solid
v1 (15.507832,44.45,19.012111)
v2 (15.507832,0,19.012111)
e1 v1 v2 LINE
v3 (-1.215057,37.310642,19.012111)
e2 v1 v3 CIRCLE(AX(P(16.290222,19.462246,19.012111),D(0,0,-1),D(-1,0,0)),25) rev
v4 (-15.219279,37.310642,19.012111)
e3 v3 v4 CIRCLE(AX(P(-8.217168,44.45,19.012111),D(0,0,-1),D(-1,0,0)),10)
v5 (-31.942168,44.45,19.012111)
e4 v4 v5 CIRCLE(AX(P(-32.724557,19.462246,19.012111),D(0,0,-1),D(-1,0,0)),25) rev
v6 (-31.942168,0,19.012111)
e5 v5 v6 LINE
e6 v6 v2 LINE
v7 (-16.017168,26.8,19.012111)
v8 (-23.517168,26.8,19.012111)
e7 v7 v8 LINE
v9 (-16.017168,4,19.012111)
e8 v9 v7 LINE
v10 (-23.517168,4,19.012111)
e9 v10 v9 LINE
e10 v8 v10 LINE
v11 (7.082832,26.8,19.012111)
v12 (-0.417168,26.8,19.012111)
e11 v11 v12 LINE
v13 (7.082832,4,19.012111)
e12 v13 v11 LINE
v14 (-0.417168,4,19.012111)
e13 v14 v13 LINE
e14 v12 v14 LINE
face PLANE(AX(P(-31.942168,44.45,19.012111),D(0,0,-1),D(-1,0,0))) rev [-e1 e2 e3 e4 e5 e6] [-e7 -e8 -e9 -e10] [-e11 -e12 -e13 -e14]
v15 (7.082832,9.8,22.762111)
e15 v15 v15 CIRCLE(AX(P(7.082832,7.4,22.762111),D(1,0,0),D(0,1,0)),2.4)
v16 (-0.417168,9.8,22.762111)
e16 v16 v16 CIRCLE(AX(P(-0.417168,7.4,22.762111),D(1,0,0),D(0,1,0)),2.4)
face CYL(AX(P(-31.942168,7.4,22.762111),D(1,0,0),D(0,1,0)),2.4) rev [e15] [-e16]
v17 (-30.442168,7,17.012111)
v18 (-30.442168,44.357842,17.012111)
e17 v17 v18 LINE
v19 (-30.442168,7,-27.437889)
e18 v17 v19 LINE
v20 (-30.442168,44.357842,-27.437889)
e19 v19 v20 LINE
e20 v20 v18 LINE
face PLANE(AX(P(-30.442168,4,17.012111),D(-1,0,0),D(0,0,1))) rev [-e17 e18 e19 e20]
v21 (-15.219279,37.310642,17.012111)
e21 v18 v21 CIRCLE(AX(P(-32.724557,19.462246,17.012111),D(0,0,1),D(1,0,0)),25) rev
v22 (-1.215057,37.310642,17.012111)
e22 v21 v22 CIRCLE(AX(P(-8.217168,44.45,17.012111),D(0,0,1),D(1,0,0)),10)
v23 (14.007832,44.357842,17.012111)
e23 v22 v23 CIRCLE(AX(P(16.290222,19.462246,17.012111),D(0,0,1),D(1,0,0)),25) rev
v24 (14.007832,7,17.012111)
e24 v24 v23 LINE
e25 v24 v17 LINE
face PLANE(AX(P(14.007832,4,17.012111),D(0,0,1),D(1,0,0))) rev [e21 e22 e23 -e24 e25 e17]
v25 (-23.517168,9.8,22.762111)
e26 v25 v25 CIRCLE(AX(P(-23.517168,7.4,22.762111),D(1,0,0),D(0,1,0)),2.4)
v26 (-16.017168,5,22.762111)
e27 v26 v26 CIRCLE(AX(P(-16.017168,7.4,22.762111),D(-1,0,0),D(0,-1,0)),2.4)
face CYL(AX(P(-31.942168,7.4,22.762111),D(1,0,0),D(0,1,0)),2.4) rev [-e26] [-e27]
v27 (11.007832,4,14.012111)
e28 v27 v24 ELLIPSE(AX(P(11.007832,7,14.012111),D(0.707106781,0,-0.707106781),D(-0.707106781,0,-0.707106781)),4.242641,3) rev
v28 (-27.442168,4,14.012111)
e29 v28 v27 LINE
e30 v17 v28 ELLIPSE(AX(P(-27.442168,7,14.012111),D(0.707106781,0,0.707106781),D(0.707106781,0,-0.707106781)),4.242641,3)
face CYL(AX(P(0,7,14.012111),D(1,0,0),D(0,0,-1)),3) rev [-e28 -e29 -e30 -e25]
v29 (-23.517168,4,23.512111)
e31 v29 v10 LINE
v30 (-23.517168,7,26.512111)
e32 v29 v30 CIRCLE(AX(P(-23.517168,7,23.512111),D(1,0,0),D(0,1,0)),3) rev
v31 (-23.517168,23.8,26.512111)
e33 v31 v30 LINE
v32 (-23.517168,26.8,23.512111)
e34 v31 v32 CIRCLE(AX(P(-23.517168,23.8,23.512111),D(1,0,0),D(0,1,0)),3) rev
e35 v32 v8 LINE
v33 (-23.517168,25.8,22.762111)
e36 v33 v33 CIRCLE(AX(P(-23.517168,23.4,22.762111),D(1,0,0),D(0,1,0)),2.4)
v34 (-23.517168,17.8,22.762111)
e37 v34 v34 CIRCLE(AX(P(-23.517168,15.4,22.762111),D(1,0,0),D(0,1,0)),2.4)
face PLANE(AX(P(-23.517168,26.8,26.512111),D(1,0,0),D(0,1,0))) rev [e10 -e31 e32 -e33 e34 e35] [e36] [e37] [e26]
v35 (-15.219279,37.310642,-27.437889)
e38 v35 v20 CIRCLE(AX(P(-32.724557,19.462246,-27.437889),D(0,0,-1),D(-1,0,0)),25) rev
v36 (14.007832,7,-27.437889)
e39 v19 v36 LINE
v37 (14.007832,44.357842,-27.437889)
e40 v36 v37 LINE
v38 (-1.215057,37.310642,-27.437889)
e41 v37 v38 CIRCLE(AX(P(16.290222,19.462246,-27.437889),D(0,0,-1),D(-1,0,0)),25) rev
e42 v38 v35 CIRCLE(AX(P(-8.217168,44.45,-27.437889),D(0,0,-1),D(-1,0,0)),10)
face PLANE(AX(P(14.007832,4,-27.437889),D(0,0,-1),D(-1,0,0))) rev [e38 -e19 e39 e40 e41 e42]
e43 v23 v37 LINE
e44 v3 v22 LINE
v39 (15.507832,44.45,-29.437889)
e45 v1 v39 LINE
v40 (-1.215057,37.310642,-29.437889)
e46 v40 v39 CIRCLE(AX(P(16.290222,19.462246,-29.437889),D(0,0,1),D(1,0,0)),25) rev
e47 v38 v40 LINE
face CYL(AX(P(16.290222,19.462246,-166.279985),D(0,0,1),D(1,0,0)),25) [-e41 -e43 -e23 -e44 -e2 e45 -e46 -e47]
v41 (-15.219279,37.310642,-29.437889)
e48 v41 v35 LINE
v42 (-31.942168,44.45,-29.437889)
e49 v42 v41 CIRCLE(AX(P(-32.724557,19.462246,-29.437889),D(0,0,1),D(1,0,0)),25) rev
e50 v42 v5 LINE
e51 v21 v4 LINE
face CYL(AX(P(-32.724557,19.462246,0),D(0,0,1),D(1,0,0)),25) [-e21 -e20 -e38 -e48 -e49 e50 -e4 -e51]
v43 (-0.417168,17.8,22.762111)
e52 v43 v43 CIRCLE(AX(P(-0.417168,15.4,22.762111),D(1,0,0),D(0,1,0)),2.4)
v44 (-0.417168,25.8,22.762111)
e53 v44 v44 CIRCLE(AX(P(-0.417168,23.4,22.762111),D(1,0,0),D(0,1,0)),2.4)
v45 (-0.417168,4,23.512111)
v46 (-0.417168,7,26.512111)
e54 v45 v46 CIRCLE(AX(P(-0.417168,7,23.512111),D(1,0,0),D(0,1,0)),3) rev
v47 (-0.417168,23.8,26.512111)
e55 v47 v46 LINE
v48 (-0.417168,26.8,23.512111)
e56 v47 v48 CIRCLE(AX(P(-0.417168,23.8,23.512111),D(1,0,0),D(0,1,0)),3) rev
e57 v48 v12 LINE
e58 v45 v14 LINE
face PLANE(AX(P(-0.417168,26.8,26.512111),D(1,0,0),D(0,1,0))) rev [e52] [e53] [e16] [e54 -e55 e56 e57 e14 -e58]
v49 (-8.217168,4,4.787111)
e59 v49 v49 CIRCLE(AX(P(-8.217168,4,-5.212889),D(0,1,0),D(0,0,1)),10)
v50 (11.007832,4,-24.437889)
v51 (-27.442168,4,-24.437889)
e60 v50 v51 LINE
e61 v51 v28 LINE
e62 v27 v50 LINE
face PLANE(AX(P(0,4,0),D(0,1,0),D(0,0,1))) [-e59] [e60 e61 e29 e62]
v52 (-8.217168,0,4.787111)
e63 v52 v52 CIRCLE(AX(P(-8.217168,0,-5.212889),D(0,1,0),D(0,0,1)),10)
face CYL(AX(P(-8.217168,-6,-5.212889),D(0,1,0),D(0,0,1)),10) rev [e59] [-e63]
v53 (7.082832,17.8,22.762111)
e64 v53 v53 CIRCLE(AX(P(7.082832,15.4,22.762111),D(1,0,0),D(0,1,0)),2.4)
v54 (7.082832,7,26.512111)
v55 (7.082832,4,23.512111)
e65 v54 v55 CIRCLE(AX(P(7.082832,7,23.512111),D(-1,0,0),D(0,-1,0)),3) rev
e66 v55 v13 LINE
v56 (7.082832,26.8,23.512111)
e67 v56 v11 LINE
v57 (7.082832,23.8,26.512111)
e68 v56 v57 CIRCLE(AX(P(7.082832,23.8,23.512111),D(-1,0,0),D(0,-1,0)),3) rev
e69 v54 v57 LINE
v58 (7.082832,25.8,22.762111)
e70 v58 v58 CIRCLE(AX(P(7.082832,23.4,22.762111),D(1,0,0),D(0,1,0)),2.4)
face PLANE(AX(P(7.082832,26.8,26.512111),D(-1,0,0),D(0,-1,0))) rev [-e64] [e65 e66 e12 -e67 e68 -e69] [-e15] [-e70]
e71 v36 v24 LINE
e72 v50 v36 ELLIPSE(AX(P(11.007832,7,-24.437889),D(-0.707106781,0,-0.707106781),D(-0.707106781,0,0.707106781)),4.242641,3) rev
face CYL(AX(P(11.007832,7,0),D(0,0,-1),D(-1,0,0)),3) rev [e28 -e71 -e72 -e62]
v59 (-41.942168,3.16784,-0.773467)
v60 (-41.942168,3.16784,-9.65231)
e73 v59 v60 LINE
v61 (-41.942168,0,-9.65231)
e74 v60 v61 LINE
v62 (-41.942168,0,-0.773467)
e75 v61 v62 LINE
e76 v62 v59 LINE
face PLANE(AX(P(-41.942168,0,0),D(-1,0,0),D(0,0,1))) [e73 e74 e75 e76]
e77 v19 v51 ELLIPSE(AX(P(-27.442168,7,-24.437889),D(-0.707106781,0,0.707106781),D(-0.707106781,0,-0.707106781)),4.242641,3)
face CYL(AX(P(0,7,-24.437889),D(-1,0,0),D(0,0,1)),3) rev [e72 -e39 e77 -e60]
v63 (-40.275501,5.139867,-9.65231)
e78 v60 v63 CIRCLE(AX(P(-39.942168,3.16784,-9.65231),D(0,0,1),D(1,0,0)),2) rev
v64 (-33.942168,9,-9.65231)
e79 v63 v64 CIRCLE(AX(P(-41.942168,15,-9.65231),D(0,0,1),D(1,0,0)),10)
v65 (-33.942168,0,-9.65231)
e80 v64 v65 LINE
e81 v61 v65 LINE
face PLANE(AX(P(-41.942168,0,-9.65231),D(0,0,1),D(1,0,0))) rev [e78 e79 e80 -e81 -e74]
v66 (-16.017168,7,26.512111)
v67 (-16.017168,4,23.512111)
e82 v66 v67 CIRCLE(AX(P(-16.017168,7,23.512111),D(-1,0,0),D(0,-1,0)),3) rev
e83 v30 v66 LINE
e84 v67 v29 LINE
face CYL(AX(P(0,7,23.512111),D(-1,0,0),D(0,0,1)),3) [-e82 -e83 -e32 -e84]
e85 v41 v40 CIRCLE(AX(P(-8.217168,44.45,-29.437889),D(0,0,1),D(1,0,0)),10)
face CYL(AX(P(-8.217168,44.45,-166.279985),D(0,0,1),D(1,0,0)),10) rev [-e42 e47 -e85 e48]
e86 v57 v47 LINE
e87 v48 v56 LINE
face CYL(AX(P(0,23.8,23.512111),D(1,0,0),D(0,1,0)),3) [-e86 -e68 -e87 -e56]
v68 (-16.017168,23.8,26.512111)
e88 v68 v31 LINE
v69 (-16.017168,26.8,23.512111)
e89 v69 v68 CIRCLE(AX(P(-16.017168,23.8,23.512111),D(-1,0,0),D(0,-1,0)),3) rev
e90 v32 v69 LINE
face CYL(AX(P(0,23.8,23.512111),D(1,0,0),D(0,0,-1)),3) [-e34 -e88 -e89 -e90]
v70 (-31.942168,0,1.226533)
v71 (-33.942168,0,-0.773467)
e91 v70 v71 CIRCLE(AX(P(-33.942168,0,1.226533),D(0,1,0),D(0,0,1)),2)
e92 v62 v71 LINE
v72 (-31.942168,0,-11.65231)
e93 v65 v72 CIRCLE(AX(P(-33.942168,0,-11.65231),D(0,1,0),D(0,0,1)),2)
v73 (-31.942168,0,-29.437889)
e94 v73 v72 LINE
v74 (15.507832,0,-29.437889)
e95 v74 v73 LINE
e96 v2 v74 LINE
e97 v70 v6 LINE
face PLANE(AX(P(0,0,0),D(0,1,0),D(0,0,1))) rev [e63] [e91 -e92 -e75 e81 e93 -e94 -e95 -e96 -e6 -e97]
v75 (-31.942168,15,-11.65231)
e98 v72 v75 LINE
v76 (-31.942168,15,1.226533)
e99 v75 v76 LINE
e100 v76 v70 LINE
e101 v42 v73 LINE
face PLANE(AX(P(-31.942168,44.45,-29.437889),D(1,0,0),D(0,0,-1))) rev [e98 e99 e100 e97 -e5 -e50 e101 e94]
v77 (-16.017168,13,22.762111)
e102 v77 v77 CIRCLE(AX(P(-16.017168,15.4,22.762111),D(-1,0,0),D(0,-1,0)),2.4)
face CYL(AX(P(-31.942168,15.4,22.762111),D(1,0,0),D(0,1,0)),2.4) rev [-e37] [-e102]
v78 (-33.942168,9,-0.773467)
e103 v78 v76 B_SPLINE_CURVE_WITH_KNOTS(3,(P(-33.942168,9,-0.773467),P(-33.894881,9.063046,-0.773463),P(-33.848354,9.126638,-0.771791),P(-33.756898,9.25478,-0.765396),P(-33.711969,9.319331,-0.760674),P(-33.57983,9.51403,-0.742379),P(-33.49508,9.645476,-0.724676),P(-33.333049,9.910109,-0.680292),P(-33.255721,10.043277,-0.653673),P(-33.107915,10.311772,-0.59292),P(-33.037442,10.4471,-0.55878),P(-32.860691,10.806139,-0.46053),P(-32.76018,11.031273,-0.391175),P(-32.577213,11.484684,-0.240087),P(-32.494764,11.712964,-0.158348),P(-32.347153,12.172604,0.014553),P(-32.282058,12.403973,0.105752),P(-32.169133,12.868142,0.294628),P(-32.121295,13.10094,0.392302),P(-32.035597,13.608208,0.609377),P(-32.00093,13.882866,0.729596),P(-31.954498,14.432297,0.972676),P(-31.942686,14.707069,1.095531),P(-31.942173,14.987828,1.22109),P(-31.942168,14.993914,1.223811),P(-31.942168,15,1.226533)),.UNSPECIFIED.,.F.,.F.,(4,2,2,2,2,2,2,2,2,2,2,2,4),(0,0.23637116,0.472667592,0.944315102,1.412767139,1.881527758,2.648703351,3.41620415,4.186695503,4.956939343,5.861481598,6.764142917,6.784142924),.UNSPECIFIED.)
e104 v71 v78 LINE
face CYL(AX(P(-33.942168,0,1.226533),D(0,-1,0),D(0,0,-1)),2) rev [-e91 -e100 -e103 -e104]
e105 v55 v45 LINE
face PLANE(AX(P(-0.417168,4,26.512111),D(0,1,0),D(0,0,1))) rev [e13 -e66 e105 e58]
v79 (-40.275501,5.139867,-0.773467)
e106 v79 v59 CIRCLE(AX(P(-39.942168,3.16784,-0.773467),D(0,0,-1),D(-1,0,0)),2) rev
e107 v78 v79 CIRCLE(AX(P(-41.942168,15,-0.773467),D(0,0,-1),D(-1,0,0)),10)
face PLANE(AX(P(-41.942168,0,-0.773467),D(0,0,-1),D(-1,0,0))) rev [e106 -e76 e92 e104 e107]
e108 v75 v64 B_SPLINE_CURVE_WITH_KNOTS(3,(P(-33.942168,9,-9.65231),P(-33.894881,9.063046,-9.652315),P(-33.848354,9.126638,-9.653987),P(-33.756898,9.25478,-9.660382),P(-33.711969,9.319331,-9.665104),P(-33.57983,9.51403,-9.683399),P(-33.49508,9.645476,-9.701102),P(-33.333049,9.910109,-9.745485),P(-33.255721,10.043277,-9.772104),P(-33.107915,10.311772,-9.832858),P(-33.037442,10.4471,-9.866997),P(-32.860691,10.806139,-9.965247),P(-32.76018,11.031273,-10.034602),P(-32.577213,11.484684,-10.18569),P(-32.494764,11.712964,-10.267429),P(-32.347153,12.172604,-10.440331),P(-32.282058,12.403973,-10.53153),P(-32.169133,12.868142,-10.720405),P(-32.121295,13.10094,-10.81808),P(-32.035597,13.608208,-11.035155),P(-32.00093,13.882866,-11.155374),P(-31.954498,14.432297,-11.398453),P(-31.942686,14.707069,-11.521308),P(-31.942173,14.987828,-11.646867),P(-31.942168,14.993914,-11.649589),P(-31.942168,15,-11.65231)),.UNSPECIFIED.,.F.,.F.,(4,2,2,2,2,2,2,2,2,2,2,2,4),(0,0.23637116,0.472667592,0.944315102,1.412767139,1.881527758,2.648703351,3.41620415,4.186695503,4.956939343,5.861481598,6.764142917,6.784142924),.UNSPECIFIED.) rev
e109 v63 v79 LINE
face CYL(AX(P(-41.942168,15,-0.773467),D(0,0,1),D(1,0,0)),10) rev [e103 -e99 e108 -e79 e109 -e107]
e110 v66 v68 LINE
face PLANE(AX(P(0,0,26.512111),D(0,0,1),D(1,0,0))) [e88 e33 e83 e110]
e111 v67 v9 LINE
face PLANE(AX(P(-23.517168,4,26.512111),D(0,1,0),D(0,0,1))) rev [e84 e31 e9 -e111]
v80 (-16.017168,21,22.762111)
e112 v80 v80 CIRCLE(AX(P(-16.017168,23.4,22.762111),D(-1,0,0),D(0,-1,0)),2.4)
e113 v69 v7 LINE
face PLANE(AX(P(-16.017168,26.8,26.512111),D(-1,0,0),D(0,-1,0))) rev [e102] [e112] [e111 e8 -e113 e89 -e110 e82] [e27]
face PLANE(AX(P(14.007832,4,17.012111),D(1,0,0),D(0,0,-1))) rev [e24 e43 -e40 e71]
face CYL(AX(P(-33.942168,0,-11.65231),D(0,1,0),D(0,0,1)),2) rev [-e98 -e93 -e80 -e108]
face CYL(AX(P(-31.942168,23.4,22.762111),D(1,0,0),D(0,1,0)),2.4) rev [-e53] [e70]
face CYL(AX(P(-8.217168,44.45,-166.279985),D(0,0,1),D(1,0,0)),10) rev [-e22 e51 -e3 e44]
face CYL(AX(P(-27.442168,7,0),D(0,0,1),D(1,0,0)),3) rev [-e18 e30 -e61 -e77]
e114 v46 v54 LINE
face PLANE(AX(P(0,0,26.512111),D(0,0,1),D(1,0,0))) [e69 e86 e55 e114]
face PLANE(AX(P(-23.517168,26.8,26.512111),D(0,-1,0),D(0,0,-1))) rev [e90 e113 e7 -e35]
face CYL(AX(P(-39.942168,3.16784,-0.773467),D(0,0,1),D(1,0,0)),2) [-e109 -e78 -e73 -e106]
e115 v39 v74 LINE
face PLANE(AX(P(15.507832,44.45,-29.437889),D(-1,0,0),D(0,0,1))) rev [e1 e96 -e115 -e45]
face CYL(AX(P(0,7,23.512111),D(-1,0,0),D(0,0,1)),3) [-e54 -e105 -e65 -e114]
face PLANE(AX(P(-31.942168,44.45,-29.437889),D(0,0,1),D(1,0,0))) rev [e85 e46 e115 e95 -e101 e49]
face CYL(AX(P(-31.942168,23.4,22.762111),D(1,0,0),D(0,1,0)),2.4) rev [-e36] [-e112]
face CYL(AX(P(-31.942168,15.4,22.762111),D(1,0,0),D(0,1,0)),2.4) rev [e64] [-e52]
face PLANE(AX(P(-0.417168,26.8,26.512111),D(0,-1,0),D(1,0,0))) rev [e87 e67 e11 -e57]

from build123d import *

# Parameters (mm, degrees)
SKETCH1_W               = 47.45
SKETCH1_H               = 48.45
BOSS_EXTRUDE1_DEPTH     = 44.45
SKETCH2_W               = 44.45
SKETCH2_H               = 44.45
CUT_EXTRUDE1_DEPTH      = 40.45
SKETCH3_W               = 7.5
SKETCH3_H               = 22.8
BOSS_EXTRUDE2_DEPTH     = 7.5
SKETCH4_R               = 2.4
CUT_EXTRUDE2_DEPTH      = 67.070738008
FILLET1_R               = 3
SKETCH5_W               = 8.878843291
SKETCH5_H               = 5
BOSS_EXTRUDE3_DEPTH     = 10
FILLET2_R               = 10
FILLET3_R               = 2
FILLET4_R               = 2
FILLET5_R               = 3
SKETCH6_R               = 10
CUT_EXTRUDE3_DEPTH      = 10
CUT_EXTRUDE5_DEPTH      = 83.857410319
CUT_EXTRUDE5_DEPTH_BACK = 83.857410319
FILLET6_R               = 25


# Some blends are built 0.0001 mm under size
with BuildPart() as part:
    # Sketch1 → Boss-Extrude1 (new body)
    with BuildSketch(Plane(origin=(0, 0, 0), x_dir=(1, 0, 0), z_dir=(0, 1, 0))):
        with Locations((-8.217167759, 5.212888782)):
            Rectangle(SKETCH1_W, SKETCH1_H)
    extrude(amount=BOSS_EXTRUDE1_DEPTH)

    # Sketch2 → Cut-Extrude1 (cut)
    with BuildSketch(Plane(origin=(0, 44.45, 0), x_dir=(1, 0, 0), z_dir=(0, 1, 0))):
        with Locations((-8.217167759, 5.212888782)):
            Rectangle(SKETCH2_W, SKETCH2_H)
    extrude(amount=-CUT_EXTRUDE1_DEPTH, mode=Mode.SUBTRACT)

    # Sketch3 → Boss-Extrude2 (add)
    with BuildSketch(Plane.XY.offset(19.012111218)):
        with Locations((-19.767167759, 15.4)):
            Rectangle(SKETCH3_W, SKETCH3_H)
        with Locations((3.332832241, 15.4)):
            Rectangle(SKETCH3_W, SKETCH3_H)
    extrude(amount=BOSS_EXTRUDE2_DEPTH)

    # Sketch4 → Cut-Extrude2 (cut, through all)
    with BuildSketch(Plane(origin=(7.082832241, 0, 0), x_dir=(0, 0, -1), z_dir=(1, 0, 0))):
        with Locations(Location((-22.762111218, 23.4, 0), (0, 0, 90))):
            Circle(SKETCH4_R)
        with Locations(Location((-22.762111218, 7.4, 0), (0, 0, 90))):
            Circle(SKETCH4_R)
        with Locations(Location((-22.762111218, 15.4, 0), (0, 0, 90))):
            Circle(SKETCH4_R)
    extrude(amount=-CUT_EXTRUDE2_DEPTH, mode=Mode.SUBTRACT)

    # Fillet1
    fillet1_edges = [part.edges().sort_by_distance(p)[0] for p in [
        (-19.767167759, 26.8, 26.512111218),
        (-19.767167759, 4, 26.512111218),
        (3.332832241, 26.8, 26.512111218),
        (3.332832241, 4, 26.512111218),
    ]]
    fillet(fillet1_edges, radius=FILLET1_R)

    # Sketch5 → Boss-Extrude3 (add)
    with BuildSketch(Plane.ZY.offset(31.942167759)):
        with Locations((-5.212888782, 2.5)):
            Rectangle(SKETCH5_W, SKETCH5_H)
    extrude(amount=BOSS_EXTRUDE3_DEPTH)

    # Fillet2
    fillet2_edges = [part.edges().sort_by_distance(p)[0] for p in [
        (-31.942167759, 5, -5.212888782),
    ]]
    fillet(fillet2_edges, radius=FILLET2_R - 0.0001)  # a hair under: the kernel refuses the full size

    # Fillet3
    fillet3_edges = [part.edges().sort_by_distance(p)[0] for p in [
        (-41.942167759, 5, -5.212888782),
    ]]
    fillet(fillet3_edges, radius=FILLET3_R)

    # Fillet4
    fillet4_edges = [part.edges().sort_by_distance(p)[0] for p in [
        (-31.942167759, 7.49995, -9.652310427),
        (-31.942167759, 7.49995, -0.773467136),
    ]]
    fillet(fillet4_edges, radius=FILLET4_R)

    # Fillet5
    fillet5_edges = [part.edges().sort_by_distance(p)[0] for p in [
        (-30.442167759, 4, -5.212888782),
        (-8.217167759, 4, -27.437888782),
        (14.007832241, 4, -5.212888782),
        (-8.217167759, 4, 17.012111218),
    ]]
    fillet(fillet5_edges, radius=FILLET5_R)

    # Sketch6 → Cut-Extrude3 (cut)
    with BuildSketch(Plane(origin=(0, 4, 0), x_dir=(1, 0, 0), z_dir=(0, 1, 0))):
        with Locations(Location((-8.217167759, 5.212888782, 0), (0, 0, 270))):
            Circle(SKETCH6_R)
    extrude(amount=-CUT_EXTRUDE3_DEPTH, mode=Mode.SUBTRACT)

    # Sketch7 → Cut-Extrude5 (cut, two sides: drawn at the far end of the back side and taken through both)
    with BuildSketch(Plane(origin=(0, 0, -29.437888782), x_dir=(-1, 0, 0), z_dir=(0, 0, -1)).offset(-CUT_EXTRUDE5_DEPTH_BACK)):
        with BuildLine():
            Line((18.217167759, 179.152496248), (18.217167759, 44.45))
            ThreePointArc((18.217167759, 44.45), (8.217167759, 34.45), (-1.782832241, 44.45))
            Line((-1.782832241, 44.45), (-1.782832241, 179.152496248))
            Line((-1.782832241, 179.152496248), (-1.782832241, 448.557488745))
            Line((-1.782832241, 448.557488745), (18.217167759, 448.557488745))
            Line((18.217167759, 448.557488745), (18.217167759, 179.152496248))
        make_face()
    extrude(amount=CUT_EXTRUDE5_DEPTH + CUT_EXTRUDE5_DEPTH_BACK, mode=Mode.SUBTRACT)

    # Fillet6
    # the kernel refuses this fillet: 25 mm, written as the material it takes off along each edge
    with BuildSketch(Plane(origin=(1.782832241, 44.45, -17.300388782), x_dir=(1, 0, 0), z_dir=(0, 0, 1)), Plane(origin=(1.782832241, 44.45, -63.750388782), x_dir=(1, 0, 0), z_dir=(0, 0, 1))) as fillet6_piece_1:
        with BuildLine():
            CenterArc((14.507389357, -24.987754339), FILLET6_R, 91.793397152, 42.650547852)
            Line((-2.997888755, -7.139358382), (-3.347994317, -6.782390463))
            ThreePointArc((-3.347994317, -6.782390463), (-1.240888915, -3.678039288), (-0.5, 0))
            Line((-0.5, 0), (0, 0.5))
            ThreePointArc((0, 0.5), (6.8625, 0.5), (13.709352213, 0.499755087))
            Line((13.709352213, 0.499755087), (13.725, 0))
        make_face()
    extrude(amount=70.625, mode=Mode.SUBTRACT)
    with BuildSketch(Plane(origin=(-18.217167759, 44.45, -17.300388782), x_dir=(-1, 0, 0), z_dir=(0, 0, 1)), Plane(origin=(-18.217167759, 44.45, -63.750388782), x_dir=(-1, 0, 0), z_dir=(0, 0, 1))) as fillet6_piece_2:
        with BuildLine():
            CenterArc((14.507389357, 24.987754339), FILLET6_R, 225.556054997, 42.650547852)
            Line((-2.997888755, 7.139358382), (-3.347994317, 6.782390463))
            ThreePointArc((-3.347994317, 6.782390463), (-1.240888915, 3.678039288), (-0.5, 0))
            Line((-0.5, 0), (0, -0.5))
            ThreePointArc((0, -0.5), (6.8625, -0.5), (13.709352213, -0.499755087))
            Line((13.709352213, -0.499755087), (13.725, 0))
        make_face()
    extrude(amount=70.625, mode=Mode.SUBTRACT)


solid = part.part
